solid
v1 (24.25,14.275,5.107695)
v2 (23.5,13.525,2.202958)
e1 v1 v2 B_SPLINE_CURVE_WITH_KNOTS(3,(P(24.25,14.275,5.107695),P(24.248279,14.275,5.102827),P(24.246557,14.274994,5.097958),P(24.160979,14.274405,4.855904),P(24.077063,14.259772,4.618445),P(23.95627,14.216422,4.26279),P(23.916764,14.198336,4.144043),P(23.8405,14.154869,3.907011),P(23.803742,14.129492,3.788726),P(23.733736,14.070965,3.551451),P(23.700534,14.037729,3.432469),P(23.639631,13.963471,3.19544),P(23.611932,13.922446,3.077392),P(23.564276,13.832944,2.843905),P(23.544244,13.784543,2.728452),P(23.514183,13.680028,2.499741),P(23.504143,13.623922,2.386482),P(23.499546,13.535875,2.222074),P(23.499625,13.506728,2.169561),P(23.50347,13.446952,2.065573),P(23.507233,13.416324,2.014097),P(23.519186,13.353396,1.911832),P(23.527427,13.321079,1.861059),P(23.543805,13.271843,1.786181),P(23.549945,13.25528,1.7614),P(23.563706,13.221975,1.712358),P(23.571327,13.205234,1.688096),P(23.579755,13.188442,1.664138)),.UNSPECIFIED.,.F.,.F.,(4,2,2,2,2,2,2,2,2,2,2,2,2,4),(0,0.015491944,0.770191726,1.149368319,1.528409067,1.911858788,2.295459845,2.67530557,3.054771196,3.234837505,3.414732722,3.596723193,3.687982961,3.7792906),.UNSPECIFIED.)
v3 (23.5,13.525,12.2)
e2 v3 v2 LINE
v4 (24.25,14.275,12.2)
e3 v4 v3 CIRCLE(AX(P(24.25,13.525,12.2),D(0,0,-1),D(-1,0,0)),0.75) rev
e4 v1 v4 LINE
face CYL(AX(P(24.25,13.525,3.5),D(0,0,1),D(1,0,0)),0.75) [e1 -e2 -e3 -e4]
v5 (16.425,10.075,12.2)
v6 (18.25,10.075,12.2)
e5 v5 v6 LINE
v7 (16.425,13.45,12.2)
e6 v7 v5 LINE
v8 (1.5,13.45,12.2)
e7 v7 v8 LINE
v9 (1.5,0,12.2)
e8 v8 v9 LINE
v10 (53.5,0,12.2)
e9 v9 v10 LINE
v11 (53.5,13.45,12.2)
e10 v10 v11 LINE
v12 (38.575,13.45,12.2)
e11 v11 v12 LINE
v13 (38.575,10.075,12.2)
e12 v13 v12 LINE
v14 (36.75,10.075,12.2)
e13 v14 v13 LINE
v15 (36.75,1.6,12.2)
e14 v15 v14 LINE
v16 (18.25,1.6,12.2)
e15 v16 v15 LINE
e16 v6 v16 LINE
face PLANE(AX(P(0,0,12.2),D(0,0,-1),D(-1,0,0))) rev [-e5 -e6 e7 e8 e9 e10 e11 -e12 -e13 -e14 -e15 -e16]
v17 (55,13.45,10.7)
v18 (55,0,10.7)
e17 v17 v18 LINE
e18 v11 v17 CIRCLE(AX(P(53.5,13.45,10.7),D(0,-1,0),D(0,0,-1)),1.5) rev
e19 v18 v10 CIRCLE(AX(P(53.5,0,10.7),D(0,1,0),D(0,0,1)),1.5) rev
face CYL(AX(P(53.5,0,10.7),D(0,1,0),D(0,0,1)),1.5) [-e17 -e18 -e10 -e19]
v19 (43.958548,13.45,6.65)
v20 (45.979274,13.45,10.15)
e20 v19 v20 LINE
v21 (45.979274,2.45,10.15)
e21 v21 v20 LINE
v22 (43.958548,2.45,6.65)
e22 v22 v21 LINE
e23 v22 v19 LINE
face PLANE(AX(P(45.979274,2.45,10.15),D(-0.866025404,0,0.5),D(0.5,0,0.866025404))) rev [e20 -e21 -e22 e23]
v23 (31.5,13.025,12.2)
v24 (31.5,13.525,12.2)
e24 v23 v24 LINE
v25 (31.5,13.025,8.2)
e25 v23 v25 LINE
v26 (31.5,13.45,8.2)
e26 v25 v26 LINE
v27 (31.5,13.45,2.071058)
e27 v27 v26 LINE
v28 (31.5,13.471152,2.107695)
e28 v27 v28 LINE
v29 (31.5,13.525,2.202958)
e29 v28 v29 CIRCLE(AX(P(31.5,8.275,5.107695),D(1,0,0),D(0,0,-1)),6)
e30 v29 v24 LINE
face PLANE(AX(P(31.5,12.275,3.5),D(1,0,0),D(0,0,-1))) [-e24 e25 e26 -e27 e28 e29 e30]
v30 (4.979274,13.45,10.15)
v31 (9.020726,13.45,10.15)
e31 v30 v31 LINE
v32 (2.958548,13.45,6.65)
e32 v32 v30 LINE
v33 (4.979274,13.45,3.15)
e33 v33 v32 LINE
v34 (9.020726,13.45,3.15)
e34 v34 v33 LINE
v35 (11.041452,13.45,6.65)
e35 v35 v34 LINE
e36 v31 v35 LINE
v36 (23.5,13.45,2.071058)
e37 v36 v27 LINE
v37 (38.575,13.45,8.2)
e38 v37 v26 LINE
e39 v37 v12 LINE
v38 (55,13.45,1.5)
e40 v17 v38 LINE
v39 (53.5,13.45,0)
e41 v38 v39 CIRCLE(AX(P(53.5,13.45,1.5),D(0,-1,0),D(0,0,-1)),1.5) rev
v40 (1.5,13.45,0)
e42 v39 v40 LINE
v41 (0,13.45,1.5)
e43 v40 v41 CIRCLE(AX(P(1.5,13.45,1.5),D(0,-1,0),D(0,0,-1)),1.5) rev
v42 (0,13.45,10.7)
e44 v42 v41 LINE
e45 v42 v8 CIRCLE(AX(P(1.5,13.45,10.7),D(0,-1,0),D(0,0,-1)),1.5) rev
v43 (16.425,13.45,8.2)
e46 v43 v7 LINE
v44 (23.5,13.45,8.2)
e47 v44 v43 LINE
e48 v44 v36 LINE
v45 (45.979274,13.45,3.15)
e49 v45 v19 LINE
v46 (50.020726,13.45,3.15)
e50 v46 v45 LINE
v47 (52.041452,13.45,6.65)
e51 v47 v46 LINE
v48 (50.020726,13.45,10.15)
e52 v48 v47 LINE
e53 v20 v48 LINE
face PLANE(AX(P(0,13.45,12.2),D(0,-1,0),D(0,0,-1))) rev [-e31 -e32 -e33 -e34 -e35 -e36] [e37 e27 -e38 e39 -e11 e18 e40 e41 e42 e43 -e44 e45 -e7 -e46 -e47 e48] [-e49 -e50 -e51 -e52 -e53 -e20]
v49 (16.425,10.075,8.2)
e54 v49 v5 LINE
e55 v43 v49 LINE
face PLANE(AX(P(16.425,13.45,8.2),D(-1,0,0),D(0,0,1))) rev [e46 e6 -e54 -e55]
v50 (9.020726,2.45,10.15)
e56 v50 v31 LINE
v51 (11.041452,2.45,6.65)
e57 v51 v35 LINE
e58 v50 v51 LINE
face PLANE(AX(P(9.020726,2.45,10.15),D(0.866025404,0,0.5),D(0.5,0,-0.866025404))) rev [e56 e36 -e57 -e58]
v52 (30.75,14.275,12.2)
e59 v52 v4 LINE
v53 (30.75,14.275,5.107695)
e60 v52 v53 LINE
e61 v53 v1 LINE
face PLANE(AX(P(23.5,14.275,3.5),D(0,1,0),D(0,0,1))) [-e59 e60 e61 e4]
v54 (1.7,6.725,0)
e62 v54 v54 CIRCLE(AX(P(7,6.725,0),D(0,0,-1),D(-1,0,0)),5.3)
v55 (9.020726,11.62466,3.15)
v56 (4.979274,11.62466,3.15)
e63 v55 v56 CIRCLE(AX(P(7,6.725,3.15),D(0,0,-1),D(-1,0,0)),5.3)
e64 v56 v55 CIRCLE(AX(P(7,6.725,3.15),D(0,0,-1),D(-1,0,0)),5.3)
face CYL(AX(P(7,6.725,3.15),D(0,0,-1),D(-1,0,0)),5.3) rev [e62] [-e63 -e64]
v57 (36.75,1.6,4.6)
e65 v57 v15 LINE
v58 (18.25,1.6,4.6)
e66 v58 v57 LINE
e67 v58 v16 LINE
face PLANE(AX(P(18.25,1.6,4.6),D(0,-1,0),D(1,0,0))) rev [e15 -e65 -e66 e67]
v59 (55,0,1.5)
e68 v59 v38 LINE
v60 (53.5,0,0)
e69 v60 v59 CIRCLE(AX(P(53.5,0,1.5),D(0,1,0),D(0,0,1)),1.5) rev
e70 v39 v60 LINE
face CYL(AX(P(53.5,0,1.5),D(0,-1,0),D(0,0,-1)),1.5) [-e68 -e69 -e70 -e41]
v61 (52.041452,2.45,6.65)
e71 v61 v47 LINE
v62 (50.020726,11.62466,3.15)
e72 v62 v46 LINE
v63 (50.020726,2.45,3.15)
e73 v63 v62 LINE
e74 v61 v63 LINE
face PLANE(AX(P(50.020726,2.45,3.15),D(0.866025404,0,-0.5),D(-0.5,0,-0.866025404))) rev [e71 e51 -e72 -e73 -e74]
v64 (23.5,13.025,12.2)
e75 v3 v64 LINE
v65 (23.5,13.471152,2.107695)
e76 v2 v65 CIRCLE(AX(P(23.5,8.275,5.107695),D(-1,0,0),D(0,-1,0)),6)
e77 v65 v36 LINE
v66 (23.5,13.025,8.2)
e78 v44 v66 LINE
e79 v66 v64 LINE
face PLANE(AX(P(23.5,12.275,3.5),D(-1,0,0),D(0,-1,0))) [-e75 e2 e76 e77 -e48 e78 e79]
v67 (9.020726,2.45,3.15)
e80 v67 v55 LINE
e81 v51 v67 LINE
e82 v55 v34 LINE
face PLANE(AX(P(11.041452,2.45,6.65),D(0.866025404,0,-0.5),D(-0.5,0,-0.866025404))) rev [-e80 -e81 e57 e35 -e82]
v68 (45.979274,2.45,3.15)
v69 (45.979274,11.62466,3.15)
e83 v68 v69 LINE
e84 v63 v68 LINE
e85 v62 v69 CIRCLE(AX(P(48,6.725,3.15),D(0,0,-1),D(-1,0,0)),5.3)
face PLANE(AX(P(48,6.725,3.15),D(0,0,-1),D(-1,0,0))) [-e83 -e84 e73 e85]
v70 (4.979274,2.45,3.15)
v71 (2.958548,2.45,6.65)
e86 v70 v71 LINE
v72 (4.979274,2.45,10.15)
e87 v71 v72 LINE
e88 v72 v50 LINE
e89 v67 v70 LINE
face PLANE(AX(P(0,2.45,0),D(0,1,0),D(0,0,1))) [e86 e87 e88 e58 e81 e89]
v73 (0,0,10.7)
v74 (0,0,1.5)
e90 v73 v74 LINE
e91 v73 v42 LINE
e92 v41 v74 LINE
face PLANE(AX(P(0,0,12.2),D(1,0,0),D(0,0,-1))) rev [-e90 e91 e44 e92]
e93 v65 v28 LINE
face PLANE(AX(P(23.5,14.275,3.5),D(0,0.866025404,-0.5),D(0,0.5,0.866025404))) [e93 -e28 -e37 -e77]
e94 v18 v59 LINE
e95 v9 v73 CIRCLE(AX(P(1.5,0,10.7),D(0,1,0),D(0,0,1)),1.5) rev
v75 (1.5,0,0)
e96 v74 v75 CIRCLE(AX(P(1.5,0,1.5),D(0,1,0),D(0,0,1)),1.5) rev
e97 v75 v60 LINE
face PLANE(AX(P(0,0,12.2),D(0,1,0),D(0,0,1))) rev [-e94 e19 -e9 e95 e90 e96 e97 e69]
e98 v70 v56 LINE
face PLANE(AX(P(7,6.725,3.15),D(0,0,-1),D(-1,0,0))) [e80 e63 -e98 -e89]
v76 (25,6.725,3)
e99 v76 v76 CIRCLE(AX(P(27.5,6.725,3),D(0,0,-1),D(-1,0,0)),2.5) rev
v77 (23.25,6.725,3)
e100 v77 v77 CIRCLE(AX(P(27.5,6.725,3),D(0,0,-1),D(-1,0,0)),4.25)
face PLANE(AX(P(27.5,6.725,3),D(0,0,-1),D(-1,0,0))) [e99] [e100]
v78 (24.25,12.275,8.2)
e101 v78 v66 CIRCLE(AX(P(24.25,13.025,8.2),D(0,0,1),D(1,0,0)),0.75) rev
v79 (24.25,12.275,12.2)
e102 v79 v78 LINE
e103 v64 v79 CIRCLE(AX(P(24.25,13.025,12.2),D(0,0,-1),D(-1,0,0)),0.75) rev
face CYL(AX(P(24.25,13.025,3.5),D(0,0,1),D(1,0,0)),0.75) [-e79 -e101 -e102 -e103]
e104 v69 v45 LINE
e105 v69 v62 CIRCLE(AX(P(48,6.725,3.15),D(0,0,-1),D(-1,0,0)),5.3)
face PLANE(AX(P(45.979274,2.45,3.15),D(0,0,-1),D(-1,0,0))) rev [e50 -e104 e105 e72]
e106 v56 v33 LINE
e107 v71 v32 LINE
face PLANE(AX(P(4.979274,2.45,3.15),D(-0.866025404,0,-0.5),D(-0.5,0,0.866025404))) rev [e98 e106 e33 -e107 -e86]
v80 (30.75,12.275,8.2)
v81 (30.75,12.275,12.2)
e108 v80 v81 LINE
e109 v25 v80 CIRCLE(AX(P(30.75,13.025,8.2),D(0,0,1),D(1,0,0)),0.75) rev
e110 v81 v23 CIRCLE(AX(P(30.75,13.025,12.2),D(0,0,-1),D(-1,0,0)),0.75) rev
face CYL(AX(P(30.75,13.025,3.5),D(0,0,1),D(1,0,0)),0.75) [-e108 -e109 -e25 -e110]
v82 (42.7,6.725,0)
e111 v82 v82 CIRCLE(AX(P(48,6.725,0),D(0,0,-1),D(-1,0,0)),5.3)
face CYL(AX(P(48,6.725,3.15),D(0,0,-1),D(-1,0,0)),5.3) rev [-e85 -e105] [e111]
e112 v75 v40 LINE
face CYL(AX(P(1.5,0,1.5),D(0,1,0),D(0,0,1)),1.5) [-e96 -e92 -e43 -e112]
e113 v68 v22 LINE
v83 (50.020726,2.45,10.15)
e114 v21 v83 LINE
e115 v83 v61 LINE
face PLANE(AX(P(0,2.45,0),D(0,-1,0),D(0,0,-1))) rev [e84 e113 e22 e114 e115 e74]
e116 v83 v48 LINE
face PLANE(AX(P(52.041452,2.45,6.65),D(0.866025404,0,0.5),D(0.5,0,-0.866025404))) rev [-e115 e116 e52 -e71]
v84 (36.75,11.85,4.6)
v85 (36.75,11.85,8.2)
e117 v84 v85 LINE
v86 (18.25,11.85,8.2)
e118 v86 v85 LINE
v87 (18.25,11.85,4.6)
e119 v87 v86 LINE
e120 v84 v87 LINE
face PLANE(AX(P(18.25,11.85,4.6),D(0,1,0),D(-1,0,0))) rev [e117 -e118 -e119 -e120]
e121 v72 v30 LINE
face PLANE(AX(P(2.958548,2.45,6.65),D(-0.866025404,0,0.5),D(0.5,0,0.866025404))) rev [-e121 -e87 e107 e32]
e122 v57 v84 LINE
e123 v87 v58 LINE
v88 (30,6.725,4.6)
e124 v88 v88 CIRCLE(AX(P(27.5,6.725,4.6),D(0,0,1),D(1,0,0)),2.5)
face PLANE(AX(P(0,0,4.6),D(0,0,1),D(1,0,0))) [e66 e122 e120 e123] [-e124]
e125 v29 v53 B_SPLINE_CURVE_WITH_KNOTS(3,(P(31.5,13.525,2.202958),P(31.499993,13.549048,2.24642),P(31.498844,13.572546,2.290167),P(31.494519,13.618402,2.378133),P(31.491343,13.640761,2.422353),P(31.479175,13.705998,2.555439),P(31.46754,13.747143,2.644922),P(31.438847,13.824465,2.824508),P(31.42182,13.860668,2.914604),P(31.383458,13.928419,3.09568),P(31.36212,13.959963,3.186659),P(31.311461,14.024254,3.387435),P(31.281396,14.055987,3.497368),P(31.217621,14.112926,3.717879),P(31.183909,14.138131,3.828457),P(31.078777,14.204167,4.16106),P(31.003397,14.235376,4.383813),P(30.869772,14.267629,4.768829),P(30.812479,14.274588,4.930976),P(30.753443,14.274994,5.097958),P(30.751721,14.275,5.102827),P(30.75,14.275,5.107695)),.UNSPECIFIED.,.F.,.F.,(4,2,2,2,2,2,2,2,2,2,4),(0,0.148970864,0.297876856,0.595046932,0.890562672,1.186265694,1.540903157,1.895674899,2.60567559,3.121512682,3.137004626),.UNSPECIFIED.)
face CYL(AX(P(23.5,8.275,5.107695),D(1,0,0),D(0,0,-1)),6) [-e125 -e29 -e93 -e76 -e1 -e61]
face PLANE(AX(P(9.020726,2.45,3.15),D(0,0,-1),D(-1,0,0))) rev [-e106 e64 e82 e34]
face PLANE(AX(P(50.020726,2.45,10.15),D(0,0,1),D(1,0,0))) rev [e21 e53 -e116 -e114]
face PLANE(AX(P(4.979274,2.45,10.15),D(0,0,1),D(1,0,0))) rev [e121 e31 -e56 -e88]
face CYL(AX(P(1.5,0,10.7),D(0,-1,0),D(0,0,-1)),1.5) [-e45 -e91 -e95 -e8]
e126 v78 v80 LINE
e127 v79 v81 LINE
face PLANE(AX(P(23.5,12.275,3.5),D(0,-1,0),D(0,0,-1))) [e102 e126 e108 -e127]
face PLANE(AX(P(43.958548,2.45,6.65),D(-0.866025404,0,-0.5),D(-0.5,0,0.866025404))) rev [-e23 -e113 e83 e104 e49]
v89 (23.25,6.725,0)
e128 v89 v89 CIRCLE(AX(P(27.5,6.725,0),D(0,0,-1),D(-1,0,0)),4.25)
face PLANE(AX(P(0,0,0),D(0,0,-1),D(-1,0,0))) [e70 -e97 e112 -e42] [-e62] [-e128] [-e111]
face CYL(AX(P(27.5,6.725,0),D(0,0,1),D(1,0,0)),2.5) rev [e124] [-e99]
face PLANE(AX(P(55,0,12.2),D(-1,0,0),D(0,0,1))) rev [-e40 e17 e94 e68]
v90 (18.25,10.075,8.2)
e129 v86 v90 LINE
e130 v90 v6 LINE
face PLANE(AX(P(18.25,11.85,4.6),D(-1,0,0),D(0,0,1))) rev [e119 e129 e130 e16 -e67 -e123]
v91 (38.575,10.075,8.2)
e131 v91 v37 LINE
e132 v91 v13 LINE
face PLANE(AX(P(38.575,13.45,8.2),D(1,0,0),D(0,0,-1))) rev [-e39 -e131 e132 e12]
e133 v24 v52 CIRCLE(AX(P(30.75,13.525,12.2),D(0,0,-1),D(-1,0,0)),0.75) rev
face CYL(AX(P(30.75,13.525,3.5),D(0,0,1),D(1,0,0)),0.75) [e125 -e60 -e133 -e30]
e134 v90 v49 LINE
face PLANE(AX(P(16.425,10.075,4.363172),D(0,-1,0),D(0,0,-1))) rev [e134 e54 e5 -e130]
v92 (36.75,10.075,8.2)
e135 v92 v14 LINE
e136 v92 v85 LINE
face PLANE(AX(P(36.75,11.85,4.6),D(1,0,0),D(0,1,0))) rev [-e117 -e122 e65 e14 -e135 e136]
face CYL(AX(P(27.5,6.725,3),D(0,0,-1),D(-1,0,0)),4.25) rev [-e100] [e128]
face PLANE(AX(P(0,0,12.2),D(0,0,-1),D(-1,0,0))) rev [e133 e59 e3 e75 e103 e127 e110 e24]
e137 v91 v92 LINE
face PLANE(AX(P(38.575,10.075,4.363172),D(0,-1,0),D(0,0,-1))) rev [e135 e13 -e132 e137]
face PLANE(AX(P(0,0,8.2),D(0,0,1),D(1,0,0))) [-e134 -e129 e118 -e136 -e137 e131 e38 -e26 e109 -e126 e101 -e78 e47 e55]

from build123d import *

# Parameters (mm, degrees)
SKETCH2_W           = 55
SKETCH2_H           = 13.45
BOSS_EXTRUDE1_DEPTH = 12.2
SKETCH3_W           = 18.5
SKETCH3_H           = 10.25
CUT_EXTRUDE1_DEPTH  = 7.6
SKETCH5_W           = 22.15
SKETCH5_H           = 1.6
CUT_EXTRUDE2_DEPTH  = 4
SKETCH6_W           = 8
SKETCH6_H           = 2
BOSS_EXTRUDE2_DEPTH = 8.7
SKETCH7_W           = 1.825
SKETCH7_H           = 3.375
CUT_EXTRUDE3_DEPTH  = 4
FILLET1_R           = 0.75
FILLET3_R           = 0.75
DRAFT4_ANGLE        = 60
FILLET5_R           = 6
SKETCH8_R           = 2.5
CUT_EXTRUDE4_DEPTH  = 58.328314378
SKETCH9_R           = 4.25
CUT_EXTRUDE5_DEPTH  = 3
SKETCH10_R          = 5.3
CUT_EXTRUDE6_DEPTH  = 3.15
CUT_EXTRUDE7_DEPTH  = 11
FILLET6_R           = 1.5


with BuildPart() as part:
    # Sketch2 → Boss-Extrude1 (new body)
    with BuildSketch(Plane.XY):
        with Locations((27.5, 6.725)):
            Rectangle(SKETCH2_W, SKETCH2_H)
    extrude(amount=BOSS_EXTRUDE1_DEPTH)

    # Sketch3 → Cut-Extrude1 (cut)
    with BuildSketch(Plane.XY.offset(12.2)):
        with Locations((27.5, 6.725)):
            Rectangle(SKETCH3_W, SKETCH3_H)
    extrude(amount=-CUT_EXTRUDE1_DEPTH, mode=Mode.SUBTRACT)

    # Sketch5 → Cut-Extrude2 (cut)
    with BuildSketch(Plane.XY.offset(12.2)):
        with Locations((27.5, 12.65)):
            Rectangle(SKETCH5_W, SKETCH5_H)
    extrude(amount=-CUT_EXTRUDE2_DEPTH, mode=Mode.SUBTRACT)

    # Sketch6 → Boss-Extrude2 (add)
    with BuildSketch(Plane.XY.offset(12.2)):
        with Locations((27.5, 13.275)):
            Rectangle(SKETCH6_W, SKETCH6_H)
    extrude(amount=-BOSS_EXTRUDE2_DEPTH)

    # Sketch7 → Cut-Extrude3 (cut)
    with BuildSketch(Plane.XY.offset(12.2)):
        with Locations((37.6625, 11.7625)):
            Rectangle(SKETCH7_W, SKETCH7_H)
        with Locations((17.3375, 11.7625)):
            Rectangle(SKETCH7_W, SKETCH7_H)
    extrude(amount=-CUT_EXTRUDE3_DEPTH, mode=Mode.SUBTRACT)

    # Fillet1
    fillet1_edges = [part.edges().sort_by_distance(p)[0] for p in [
        (31.5, 14.275, 7.85),
        (31.5, 12.275, 10.2),
    ]]
    fillet(fillet1_edges, radius=FILLET1_R)

    # Fillet3
    fillet3_edges = [part.edges().sort_by_distance(p)[0] for p in [
        (23.5, 12.275, 10.2),
        (23.5, 14.275, 7.85),
    ]]
    fillet(fillet3_edges, radius=FILLET3_R)

    # Draft4
    draft4_faces = [part.faces().sort_by_distance(p)[0] for p in [
        (27.5, 13.853198642, 3.5),
    ]]
    draft(draft4_faces, Plane(origin=(23.5, 14.275, 3.5), x_dir=(0, 0, 1), z_dir=(0, 1, 0)), DRAFT4_ANGLE)

    # Fillet5
    # the kernel refuses this fillet: 6 mm, written as the material it takes off along each edge
    with BuildSketch(Plane(origin=(34.769237886, 14.275, 3.5), x_dir=(0, -0.49999999999999784, -0.8660254037844399), z_dir=(-1, 0, 0))) as fillet5_piece_1:
        with BuildLine():
            CenterArc((FILLET5_R * 0.267949192431, FILLET5_R), FILLET5_R, 240, 30)
            Line((-FILLET5_R * 0.232050807569, FILLET5_R * 0.133974596216), (0, 0))
            Line((0, 0), (FILLET5_R * 0.267949192431, 0))
        make_face()
    extrude(amount=14.538475773, mode=Mode.SUBTRACT)

    # Sketch8 → Cut-Extrude4 (cut, through all)
    with BuildSketch(Plane.XY.offset(4.6)):
        with Locations((27.5, 6.725)):
            Circle(SKETCH8_R)
    extrude(amount=-CUT_EXTRUDE4_DEPTH, mode=Mode.SUBTRACT)

    # Sketch9 → Cut-Extrude5 (cut)
    with BuildSketch(Plane(origin=(0, 0, 0), x_dir=(-1, 0, 0), z_dir=(0, 0, -1))):
        with Locations((-27.5, 6.725)):
            Circle(SKETCH9_R)
    extrude(amount=-CUT_EXTRUDE5_DEPTH, mode=Mode.SUBTRACT)

    # Sketch10 → Cut-Extrude6 (cut)
    with BuildSketch(Plane(origin=(0, 0, 0), x_dir=(-1, 0, 0), z_dir=(0, 0, -1))):
        with Locations((-48, 6.725)):
            Circle(SKETCH10_R)
        with Locations((-7, 6.725)):
            Circle(SKETCH10_R)
    extrude(amount=-CUT_EXTRUDE6_DEPTH, mode=Mode.SUBTRACT)

    # Sketch11 → Cut-Extrude7 (cut)
    with BuildSketch(Plane(origin=(0, 13.45, 0), x_dir=(1, 0, 0), z_dir=(0, 1, 0))):
        Polygon((9.020725942, -3.15), (4.979274058, -3.15), (2.958548116, -6.65), (4.979274058, -10.15), (9.020725942, -10.15), (11.041451884, -6.65), align=None)
        Polygon((43.958548116, -6.65), (45.979274058, -3.15), (50.020725942, -3.15), (52.041451884, -6.65), (50.020725942, -10.15), (45.979274058, -10.15), align=None)
    extrude(amount=-CUT_EXTRUDE7_DEPTH, mode=Mode.SUBTRACT)

    # Fillet6
    fillet6_edges = [part.edges().sort_by_distance(p)[0] for p in [
        (55, 6.725, 12.2),
        (0, 6.725, 12.2),
        (55, 6.725, 0),
        (0, 6.725, 0),
    ]]
    fillet(fillet6_edges, radius=FILLET6_R)


solid = part.part
